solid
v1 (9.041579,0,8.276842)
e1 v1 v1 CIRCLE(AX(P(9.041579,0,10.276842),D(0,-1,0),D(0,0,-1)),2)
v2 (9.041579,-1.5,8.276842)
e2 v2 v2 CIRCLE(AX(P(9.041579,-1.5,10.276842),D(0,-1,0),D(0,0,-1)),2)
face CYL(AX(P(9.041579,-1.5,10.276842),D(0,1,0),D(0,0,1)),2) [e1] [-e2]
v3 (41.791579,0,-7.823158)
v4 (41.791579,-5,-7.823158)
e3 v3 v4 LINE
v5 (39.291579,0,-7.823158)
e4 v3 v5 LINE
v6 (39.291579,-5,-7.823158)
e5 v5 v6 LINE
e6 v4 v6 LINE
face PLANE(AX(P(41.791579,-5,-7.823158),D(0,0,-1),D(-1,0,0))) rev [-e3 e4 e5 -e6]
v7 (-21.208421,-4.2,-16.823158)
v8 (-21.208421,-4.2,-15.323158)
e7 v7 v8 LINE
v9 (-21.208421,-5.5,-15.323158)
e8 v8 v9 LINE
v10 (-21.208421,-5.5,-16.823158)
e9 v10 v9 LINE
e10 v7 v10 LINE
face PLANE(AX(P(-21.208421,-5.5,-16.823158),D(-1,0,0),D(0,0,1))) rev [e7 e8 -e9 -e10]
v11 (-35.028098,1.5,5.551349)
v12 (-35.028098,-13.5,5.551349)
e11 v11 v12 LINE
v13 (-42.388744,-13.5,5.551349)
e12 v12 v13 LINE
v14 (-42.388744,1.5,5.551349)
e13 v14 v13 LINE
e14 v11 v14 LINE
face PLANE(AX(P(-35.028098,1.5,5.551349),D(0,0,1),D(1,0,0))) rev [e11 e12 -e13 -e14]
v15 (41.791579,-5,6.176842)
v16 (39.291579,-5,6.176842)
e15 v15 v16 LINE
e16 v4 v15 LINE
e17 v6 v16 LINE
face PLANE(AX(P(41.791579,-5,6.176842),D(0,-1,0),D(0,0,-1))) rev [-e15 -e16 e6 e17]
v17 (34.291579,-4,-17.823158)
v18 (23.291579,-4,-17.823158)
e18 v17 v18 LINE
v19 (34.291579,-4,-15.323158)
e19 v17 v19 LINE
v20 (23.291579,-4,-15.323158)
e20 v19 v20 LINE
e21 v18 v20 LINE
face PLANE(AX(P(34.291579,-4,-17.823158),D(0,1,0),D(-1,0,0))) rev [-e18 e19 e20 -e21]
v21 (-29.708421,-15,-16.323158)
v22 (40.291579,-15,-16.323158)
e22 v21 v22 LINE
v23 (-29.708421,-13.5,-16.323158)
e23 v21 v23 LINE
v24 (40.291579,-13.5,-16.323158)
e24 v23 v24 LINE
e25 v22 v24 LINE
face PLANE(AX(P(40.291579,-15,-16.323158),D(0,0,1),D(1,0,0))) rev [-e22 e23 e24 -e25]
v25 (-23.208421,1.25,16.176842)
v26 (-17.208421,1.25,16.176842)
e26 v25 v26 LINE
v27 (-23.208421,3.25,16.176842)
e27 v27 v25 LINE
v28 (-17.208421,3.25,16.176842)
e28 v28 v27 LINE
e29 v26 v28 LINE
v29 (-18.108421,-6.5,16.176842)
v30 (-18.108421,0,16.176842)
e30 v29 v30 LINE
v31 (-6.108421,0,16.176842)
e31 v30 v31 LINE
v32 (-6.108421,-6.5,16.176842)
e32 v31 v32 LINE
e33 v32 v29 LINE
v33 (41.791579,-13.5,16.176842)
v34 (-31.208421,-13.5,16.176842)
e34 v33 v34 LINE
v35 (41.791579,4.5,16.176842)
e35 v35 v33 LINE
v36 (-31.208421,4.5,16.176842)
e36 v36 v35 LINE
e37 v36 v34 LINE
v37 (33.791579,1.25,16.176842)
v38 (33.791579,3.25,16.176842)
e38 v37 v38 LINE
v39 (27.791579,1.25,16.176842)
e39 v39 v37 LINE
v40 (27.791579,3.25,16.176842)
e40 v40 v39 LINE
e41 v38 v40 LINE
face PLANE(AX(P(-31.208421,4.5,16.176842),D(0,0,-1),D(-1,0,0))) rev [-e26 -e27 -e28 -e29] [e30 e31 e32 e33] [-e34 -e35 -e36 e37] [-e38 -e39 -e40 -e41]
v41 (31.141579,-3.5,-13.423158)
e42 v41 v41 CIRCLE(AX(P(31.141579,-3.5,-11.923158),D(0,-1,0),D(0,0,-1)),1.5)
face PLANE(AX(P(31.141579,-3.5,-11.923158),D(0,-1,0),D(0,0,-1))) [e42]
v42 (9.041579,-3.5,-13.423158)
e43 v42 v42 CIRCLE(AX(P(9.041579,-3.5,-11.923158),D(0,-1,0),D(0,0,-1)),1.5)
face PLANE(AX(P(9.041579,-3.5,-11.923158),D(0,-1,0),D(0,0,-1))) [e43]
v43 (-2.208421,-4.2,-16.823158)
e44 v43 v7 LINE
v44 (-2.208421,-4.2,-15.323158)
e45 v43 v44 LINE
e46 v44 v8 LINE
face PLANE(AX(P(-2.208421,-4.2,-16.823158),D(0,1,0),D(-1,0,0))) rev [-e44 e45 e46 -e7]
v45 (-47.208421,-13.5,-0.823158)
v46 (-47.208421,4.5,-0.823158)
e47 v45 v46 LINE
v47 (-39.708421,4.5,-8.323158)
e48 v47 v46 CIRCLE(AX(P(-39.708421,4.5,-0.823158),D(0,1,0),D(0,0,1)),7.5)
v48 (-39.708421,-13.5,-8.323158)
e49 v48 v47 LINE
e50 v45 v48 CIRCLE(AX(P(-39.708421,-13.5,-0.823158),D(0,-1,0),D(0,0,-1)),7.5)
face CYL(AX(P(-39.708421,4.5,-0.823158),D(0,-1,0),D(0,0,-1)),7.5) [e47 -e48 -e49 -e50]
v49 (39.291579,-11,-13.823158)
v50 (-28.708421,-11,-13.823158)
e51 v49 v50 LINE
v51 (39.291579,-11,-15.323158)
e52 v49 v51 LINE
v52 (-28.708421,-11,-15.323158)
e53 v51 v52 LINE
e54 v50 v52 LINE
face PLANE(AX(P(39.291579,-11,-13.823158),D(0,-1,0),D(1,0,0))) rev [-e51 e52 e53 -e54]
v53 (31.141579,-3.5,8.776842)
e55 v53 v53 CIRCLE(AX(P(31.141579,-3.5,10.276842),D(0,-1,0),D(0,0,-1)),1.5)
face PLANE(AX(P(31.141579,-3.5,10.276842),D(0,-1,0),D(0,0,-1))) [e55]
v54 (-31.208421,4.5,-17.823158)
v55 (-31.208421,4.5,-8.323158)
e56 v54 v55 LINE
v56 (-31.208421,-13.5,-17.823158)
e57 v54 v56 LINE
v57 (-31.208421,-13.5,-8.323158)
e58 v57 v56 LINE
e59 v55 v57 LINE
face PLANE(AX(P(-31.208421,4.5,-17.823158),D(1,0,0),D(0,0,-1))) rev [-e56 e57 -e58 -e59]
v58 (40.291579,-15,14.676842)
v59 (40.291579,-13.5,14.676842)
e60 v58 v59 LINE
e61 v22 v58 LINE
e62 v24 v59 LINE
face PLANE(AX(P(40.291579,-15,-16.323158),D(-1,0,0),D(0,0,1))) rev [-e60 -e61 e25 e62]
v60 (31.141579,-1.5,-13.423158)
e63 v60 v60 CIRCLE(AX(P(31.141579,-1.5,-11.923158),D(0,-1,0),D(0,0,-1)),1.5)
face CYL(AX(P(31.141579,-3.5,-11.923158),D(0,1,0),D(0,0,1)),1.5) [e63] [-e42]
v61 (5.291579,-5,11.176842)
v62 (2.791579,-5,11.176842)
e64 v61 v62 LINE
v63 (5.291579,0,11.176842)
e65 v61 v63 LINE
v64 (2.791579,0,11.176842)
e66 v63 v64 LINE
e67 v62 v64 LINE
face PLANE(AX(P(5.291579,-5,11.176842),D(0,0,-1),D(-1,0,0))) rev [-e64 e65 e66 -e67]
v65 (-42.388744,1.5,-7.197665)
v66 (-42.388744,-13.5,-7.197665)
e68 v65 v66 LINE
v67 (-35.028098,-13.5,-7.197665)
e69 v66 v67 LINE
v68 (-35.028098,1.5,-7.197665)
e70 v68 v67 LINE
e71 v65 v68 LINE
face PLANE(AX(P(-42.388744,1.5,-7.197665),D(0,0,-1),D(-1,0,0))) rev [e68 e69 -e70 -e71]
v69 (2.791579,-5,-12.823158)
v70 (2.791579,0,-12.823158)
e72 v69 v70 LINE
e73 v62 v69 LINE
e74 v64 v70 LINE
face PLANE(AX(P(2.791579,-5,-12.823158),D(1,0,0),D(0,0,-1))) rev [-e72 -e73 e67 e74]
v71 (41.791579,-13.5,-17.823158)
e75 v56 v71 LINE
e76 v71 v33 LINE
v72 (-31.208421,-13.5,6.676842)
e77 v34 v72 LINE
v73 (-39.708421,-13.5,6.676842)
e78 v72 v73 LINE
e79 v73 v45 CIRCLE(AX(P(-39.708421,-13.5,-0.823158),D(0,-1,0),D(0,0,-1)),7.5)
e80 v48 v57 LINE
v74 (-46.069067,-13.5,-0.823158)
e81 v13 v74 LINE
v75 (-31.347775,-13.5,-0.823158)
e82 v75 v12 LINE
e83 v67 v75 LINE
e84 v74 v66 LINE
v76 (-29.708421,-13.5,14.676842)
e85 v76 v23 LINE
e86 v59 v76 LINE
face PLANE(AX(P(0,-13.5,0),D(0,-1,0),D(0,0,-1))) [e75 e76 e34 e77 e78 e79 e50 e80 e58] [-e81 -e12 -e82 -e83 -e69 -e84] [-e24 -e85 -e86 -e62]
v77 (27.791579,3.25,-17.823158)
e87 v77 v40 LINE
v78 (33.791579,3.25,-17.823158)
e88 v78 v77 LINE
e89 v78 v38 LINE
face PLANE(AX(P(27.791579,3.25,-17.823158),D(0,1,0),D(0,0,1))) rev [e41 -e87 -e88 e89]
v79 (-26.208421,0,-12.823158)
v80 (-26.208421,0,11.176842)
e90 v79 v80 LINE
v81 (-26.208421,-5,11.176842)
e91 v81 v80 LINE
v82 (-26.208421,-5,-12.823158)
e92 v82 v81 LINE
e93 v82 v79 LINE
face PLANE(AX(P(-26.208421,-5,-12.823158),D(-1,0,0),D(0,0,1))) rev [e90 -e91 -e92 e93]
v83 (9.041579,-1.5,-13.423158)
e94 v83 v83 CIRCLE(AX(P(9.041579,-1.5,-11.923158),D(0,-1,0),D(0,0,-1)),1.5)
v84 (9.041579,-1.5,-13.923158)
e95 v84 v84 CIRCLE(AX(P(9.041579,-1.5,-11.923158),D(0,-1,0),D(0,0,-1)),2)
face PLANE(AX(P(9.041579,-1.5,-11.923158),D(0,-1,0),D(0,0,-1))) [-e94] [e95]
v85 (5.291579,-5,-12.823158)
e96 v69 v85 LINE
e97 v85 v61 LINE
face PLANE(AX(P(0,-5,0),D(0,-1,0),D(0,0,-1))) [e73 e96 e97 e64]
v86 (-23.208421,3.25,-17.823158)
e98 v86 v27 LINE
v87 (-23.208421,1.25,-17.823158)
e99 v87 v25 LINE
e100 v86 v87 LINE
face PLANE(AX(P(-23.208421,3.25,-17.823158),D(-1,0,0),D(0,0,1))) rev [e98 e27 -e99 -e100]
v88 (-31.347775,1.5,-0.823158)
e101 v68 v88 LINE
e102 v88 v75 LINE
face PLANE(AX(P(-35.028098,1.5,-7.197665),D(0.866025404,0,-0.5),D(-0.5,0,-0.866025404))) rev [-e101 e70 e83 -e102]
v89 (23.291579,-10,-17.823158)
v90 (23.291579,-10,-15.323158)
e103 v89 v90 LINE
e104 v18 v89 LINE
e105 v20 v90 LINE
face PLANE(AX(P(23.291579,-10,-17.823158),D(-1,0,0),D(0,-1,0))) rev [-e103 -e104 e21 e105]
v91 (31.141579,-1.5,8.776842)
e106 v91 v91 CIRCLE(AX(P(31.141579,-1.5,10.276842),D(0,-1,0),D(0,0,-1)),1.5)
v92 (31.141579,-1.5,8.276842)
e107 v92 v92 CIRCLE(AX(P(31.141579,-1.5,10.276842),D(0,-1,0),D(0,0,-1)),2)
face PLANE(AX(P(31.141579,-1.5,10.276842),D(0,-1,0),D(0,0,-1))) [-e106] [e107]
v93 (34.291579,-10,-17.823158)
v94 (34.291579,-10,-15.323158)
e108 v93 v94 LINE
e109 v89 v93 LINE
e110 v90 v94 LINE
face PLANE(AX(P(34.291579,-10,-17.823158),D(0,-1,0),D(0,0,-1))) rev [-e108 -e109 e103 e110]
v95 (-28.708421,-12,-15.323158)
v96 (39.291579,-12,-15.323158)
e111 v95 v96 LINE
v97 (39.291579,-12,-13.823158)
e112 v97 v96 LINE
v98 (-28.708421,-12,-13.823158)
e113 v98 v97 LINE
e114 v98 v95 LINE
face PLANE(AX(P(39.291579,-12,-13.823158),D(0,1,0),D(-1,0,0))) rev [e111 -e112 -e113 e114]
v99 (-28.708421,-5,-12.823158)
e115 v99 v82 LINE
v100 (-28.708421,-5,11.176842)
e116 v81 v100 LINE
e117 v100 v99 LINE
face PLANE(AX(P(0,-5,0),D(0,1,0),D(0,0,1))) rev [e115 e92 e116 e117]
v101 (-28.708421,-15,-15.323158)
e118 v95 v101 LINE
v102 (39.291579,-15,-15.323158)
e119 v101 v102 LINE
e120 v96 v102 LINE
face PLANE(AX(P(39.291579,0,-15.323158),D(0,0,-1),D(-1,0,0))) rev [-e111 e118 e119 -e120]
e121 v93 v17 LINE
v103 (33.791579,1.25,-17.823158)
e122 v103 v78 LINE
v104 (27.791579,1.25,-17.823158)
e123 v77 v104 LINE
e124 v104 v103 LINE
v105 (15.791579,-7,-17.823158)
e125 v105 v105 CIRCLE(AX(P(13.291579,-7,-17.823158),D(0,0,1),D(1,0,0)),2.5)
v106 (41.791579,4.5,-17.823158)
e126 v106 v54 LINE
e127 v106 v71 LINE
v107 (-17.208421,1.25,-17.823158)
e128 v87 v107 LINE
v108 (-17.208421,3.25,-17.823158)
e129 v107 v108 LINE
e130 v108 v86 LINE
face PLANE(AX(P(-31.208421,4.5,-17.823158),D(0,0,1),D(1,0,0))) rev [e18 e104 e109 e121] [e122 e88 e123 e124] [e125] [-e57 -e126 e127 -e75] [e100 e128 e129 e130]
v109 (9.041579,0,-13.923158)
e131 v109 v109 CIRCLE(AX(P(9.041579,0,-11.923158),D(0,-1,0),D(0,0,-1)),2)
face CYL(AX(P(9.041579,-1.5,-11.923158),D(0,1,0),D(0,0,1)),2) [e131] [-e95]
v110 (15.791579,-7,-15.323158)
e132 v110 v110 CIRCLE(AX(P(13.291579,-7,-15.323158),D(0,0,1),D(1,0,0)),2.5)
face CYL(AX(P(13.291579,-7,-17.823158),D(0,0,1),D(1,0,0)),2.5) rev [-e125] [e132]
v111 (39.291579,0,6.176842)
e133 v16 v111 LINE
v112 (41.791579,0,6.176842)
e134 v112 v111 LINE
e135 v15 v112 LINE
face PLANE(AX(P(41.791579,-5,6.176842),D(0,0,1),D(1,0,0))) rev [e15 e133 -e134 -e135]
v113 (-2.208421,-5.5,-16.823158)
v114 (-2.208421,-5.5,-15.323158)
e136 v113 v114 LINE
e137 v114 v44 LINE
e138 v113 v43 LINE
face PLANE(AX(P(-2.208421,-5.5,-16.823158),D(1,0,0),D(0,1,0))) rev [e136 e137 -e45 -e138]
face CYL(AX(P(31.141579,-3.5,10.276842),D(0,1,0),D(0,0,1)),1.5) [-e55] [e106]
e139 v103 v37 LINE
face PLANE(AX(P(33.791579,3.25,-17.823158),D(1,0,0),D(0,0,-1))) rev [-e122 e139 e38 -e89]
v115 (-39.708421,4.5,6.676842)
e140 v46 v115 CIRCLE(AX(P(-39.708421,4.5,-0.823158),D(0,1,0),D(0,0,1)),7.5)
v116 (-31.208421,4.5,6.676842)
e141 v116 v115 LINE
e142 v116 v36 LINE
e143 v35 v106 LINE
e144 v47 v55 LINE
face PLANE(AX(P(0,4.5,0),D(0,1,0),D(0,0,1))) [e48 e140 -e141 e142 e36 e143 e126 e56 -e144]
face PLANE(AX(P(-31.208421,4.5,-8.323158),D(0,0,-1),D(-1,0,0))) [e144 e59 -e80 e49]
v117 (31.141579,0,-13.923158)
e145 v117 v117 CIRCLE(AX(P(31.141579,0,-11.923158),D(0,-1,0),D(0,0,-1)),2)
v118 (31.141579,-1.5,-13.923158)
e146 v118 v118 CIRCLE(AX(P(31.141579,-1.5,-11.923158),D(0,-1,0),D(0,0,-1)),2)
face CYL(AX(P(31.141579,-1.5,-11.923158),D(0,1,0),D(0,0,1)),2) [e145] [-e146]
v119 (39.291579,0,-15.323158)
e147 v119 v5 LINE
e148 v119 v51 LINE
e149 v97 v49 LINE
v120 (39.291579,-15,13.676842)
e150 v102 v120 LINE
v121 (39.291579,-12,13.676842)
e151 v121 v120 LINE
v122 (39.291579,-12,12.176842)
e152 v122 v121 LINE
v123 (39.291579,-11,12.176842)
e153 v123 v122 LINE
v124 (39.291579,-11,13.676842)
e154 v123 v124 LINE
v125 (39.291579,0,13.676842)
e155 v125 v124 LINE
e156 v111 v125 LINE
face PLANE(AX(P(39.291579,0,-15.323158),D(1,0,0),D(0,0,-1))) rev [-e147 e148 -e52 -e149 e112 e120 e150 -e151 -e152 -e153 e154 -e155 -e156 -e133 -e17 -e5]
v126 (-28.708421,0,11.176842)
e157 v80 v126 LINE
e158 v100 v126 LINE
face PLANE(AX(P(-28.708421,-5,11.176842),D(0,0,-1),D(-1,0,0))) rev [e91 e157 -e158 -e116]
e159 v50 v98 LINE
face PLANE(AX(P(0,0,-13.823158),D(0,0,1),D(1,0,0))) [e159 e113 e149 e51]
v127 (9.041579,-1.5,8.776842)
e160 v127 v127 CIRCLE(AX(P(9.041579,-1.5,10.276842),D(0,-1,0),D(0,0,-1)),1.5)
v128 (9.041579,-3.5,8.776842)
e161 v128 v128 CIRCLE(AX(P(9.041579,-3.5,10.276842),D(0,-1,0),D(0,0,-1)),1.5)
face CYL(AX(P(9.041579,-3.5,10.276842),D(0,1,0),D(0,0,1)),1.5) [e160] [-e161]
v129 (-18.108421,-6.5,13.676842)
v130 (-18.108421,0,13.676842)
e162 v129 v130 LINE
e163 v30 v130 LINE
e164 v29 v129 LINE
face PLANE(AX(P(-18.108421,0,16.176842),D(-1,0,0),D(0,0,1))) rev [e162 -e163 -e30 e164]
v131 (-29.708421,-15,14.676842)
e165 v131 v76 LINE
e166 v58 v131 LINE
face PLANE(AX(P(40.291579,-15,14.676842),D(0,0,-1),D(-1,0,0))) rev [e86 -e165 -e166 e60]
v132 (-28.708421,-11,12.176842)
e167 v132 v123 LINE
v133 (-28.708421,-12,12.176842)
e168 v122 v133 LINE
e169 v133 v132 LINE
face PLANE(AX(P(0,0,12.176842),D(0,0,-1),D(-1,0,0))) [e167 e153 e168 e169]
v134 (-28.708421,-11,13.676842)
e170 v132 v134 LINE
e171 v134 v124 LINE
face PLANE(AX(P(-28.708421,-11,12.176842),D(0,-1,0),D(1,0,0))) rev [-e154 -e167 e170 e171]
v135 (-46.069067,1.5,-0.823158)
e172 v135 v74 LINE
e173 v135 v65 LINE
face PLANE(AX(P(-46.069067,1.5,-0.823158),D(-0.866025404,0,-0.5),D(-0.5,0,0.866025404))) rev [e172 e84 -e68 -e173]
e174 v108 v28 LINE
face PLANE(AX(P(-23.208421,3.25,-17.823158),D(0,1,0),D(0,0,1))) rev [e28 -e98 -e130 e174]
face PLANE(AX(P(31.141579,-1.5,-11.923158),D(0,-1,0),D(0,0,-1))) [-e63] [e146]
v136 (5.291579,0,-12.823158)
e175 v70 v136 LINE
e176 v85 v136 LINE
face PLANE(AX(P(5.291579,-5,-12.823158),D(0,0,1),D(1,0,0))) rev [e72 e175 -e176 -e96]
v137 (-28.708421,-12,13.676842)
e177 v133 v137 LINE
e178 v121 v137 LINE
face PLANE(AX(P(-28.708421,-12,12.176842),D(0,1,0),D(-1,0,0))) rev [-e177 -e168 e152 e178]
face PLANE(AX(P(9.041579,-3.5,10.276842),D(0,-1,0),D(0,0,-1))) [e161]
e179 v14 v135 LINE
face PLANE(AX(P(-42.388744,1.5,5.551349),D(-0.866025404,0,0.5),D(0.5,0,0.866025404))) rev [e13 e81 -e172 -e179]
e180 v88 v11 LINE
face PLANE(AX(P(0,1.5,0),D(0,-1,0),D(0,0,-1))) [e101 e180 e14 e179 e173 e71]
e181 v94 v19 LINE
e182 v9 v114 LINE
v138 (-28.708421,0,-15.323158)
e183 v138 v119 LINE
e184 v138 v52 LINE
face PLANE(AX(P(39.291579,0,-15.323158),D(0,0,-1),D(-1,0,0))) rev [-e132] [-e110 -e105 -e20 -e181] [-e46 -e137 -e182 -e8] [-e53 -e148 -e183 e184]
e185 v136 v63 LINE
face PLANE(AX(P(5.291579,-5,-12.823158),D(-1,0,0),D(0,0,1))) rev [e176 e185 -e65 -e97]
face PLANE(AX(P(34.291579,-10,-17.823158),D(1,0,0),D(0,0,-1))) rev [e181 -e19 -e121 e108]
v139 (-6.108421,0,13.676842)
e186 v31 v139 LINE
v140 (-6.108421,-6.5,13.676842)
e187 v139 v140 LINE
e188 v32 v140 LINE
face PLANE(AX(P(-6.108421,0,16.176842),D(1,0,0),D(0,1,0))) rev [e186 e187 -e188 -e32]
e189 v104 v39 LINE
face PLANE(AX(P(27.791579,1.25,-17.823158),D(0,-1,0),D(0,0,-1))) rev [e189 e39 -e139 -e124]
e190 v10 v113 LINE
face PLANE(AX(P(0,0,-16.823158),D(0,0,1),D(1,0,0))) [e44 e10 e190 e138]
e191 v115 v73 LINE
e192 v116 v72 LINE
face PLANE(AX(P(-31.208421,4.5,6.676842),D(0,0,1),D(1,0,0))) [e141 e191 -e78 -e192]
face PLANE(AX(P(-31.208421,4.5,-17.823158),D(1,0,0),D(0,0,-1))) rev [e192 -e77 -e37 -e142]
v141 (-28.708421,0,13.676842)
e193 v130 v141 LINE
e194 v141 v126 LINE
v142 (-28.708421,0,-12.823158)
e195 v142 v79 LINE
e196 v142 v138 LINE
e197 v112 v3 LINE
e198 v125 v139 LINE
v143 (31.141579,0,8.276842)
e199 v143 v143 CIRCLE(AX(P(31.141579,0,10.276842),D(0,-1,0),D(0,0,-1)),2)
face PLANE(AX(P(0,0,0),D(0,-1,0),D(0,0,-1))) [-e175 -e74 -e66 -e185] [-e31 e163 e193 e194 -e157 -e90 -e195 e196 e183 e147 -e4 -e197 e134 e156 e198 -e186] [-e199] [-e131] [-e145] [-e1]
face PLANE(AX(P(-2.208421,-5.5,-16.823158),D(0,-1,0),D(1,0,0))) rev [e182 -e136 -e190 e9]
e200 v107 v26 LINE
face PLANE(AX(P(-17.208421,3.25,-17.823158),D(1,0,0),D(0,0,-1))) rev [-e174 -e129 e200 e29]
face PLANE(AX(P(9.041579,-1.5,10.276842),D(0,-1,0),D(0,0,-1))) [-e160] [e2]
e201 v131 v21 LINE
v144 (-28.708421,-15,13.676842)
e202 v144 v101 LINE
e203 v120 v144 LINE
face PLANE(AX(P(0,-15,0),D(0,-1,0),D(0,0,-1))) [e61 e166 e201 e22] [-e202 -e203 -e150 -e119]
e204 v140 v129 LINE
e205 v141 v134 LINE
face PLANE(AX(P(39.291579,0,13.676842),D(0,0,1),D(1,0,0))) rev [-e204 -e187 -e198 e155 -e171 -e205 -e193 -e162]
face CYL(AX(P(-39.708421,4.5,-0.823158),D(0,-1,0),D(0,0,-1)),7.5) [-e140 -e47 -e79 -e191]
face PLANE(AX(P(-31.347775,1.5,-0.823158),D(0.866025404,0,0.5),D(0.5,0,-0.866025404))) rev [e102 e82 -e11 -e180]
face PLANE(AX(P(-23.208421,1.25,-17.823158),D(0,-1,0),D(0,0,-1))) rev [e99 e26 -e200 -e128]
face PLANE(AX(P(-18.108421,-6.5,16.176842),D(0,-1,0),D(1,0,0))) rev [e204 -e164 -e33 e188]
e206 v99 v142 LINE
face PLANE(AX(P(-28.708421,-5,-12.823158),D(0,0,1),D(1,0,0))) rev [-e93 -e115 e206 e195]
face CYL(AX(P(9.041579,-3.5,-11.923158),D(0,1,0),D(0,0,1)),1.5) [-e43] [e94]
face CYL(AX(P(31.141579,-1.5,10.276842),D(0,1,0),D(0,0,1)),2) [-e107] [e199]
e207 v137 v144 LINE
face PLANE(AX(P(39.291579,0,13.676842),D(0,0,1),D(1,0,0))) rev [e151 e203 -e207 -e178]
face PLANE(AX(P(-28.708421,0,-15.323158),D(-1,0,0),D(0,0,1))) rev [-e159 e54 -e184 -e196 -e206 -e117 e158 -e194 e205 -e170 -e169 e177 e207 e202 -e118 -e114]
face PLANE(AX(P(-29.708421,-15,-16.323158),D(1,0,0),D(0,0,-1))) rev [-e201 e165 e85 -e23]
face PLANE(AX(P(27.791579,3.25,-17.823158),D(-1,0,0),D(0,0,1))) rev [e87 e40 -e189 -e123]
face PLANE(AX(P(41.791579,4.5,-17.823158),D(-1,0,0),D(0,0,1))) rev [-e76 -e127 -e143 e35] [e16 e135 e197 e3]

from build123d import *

# Parameters (mm, degrees)
SKETCH1_W             = 73
SKETCH1_H             = 34
BASE_DEPTH            = 4.5
SKETCH21_W            = 73
SKETCH21_H            = 34
EXTRUDE_UP_DEPTH      = 13.5
SKETCH22_W            = 68
SKETCH22_H            = 29
CUT_DOWN_DEPTH        = 13.5
SKETCH27_R            = 2
BOSS_EXTRUDE15_DEPTH  = 1.5
SKETCH29_R            = 2
BOSS_EXTRUDE16_DEPTH  = 1.5
SKETCH30_R            = 2
BOSS_EXTRUDE17_DEPTH  = 1.5
SKETCH28_R            = 2
BOSS_EXTRUDE18_DEPTH  = 1.5
SKETCH31_R            = 1.5
BOSS_EXTRUDE19_DEPTH  = 2
SKETCH32_R            = 1.5
BOSS_EXTRUDE20_DEPTH  = 2
SKETCH33_R            = 1.5
BOSS_EXTRUDE21_DEPTH  = 2
SKETCH34_R            = 1.5
BOSS_EXTRUDE22_DEPTH  = 2
SKETCH39_W            = 19
SKETCH39_H            = 1.3
WALL_SLIT_DEPTH       = 1.5
SKETCH41_W            = 2.5
SKETCH41_H            = 24
OUTSIDE_BLOCK_DEPTH   = 5
SKETCH44_W            = 2.5
SKETCH44_H            = 24
INSIDE_BLOCK_DEPTH    = 5
SKETCH45_W            = 12
SKETCH45_H            = 6.5
USB_HOLE_DEPTH        = 2.5
SKETCH62_W            = 70
SKETCH62_H            = 31
RAISE_LIP_DEPTH       = 1.5
SKETCH63_W            = 68
SKETCH63_H            = 29
CUT_LIP_DEPTH         = 1.5
SKETCH47_W            = 6
SKETCH47_H            = 2
TOP_TIE_HOLE_DEPTH    = 34
SKETCH48_W            = 6
SKETCH48_H            = 2
BOTTOM_TIE_HOLE_DEPTH = 34
SKETCH56_W            = 14
SKETCH56_H            = 5
WIRE_HOLE_DEPTH       = 2.5
SKETCH68_W            = 68
SKETCH68_H            = 1
RIGHT_LEDGE_DEPTH     = 1.5
SKETCH67_W            = 68
SKETCH67_H            = 1
LEFT_LEDGE_DEPTH      = 1.5
SKETCH65_W            = 16
SKETCH65_H            = 15
NUT_HOLE_SQUARE_DEPTH = 18
NUT_HOLE_FILLET_R     = 7.5
NUT_HOLE_HEX_DEPTH    = 15
SKETCH69_W            = 11
SKETCH69_H            = 6
CUT_EXTRUDE1_DEPTH    = 2.5
SKETCH70_R            = 2.5
CUT_EXTRUDE2_DEPTH    = 2.5


with BuildPart() as part:
    # Sketch1 → base (new body)
    with BuildSketch(Plane(origin=(0, 0, 0), x_dir=(1, 0, 0), z_dir=(0, 1, 0))):
        with Locations((5.291578947, 0.823157895)):
            Rectangle(SKETCH1_W, SKETCH1_H)
    extrude(amount=BASE_DEPTH)

    # Sketch21 → extrude up (add)
    with BuildSketch(Plane(origin=(0, 0, 0), x_dir=(-1, 0, 0), z_dir=(0, -1, 0))):
        with Locations((-5.291578947, 0.823157895)):
            Rectangle(SKETCH21_W, SKETCH21_H)
    extrude(amount=EXTRUDE_UP_DEPTH)

    # Sketch22 → cut down (cut)
    with BuildSketch(Plane(origin=(0, -13.5, 0), x_dir=(-1, 0, 0), z_dir=(0, -1, 0))):
        with Locations((-5.291578947, 0.823157895)):
            Rectangle(SKETCH22_W, SKETCH22_H)
    extrude(amount=-CUT_DOWN_DEPTH, mode=Mode.SUBTRACT)

    # Sketch27 → Boss-Extrude15 (add)
    with BuildSketch(Plane.XZ):
        with Locations(Location((31.141578947, -11.923157895, 0), (0, 0, 270))):
            Circle(SKETCH27_R)
    extrude(amount=BOSS_EXTRUDE15_DEPTH)

    # Sketch29 → Boss-Extrude16 (add)
    with BuildSketch(Plane.XZ):
        with Locations(Location((9.041578947, -11.923157895, 0), (0, 0, 270))):
            Circle(SKETCH29_R)
    extrude(amount=BOSS_EXTRUDE16_DEPTH)

    # Sketch30 → Boss-Extrude17 (add)
    with BuildSketch(Plane.XZ):
        with Locations(Location((9.041578947, 10.276842105, 0), (0, 0, 270))):
            Circle(SKETCH30_R)
    extrude(amount=BOSS_EXTRUDE17_DEPTH)

    # Sketch28 → Boss-Extrude18 (add)
    with BuildSketch(Plane.XZ):
        with Locations(Location((31.141578947, 10.276842105, 0), (0, 0, 270))):
            Circle(SKETCH28_R)
    extrude(amount=BOSS_EXTRUDE18_DEPTH)

    # Sketch31 → Boss-Extrude19 (add)
    with BuildSketch(Plane.XZ.offset(1.5)):
        with Locations(Location((31.141578947, -11.923157895, 0), (0, 0, 270))):
            Circle(SKETCH31_R)
    extrude(amount=BOSS_EXTRUDE19_DEPTH)

    # Sketch32 → Boss-Extrude20 (add)
    with BuildSketch(Plane.XZ.offset(1.5)):
        with Locations(Location((9.041578947, -11.923157895, 0), (0, 0, 270))):
            Circle(SKETCH32_R)
    extrude(amount=BOSS_EXTRUDE20_DEPTH)

    # Sketch33 → Boss-Extrude21 (add)
    with BuildSketch(Plane.XZ.offset(1.5)):
        with Locations(Location((9.041578947, 10.276842105, 0), (0, 0, 270))):
            Circle(SKETCH33_R)
    extrude(amount=BOSS_EXTRUDE21_DEPTH)

    # Sketch34 → Boss-Extrude22 (add)
    with BuildSketch(Plane.XZ.offset(1.5)):
        with Locations(Location((31.141578947, 10.276842105, 0), (0, 0, 270))):
            Circle(SKETCH34_R)
    extrude(amount=BOSS_EXTRUDE22_DEPTH)

    # Sketch39 → wall slit (cut)
    with BuildSketch(Plane.XY.offset(-15.323157895)):
        with Locations((-11.708421053, -4.85)):
            Rectangle(SKETCH39_W, SKETCH39_H)
    extrude(amount=-WALL_SLIT_DEPTH, mode=Mode.SUBTRACT)

    # Sketch41 → outside block (add)
    with BuildSketch(Plane.XZ):
        with Locations((-27.458421053, -0.823157895)):
            Rectangle(SKETCH41_W, SKETCH41_H)
    extrude(amount=OUTSIDE_BLOCK_DEPTH)

    # Sketch44 → inside block (add)
    with BuildSketch(Plane.XZ):
        with Locations((4.041578947, -0.823157895)):
            Rectangle(SKETCH44_W, SKETCH44_H)
    extrude(amount=INSIDE_BLOCK_DEPTH)

    # Sketch45 → usb hole (cut)
    with BuildSketch(Plane(origin=(0, 0, 13.676842105), x_dir=(-1, 0, 0), z_dir=(0, 0, -1))):
        with Locations((12.108421053, -3.25)):
            Rectangle(SKETCH45_W, SKETCH45_H)
    extrude(amount=-USB_HOLE_DEPTH, mode=Mode.SUBTRACT)

    # Sketch62 → raise lip (add)
    with BuildSketch(Plane.XZ.offset(13.5)):
        with Locations((5.291578947, -0.823157895)):
            Rectangle(SKETCH62_W, SKETCH62_H)
    extrude(amount=RAISE_LIP_DEPTH)

    # Sketch63 → cut lip (cut)
    with BuildSketch(Plane.XZ.offset(15)):
        with Locations((5.291578947, -0.823157895)):
            Rectangle(SKETCH63_W, SKETCH63_H)
    extrude(amount=-CUT_LIP_DEPTH, mode=Mode.SUBTRACT)

    # Sketch47 → top tie hole (cut)
    with BuildSketch(Plane.XY.offset(16.176842105)):
        with Locations((30.791578947, 2.25)):
            Rectangle(SKETCH47_W, SKETCH47_H)
    extrude(amount=-TOP_TIE_HOLE_DEPTH, mode=Mode.SUBTRACT)

    # Sketch48 → bottom tie hole (cut)
    with BuildSketch(Plane.XY.offset(16.176842105)):
        with Locations((-20.208421053, 2.25)):
            Rectangle(SKETCH48_W, SKETCH48_H)
    extrude(amount=-BOTTOM_TIE_HOLE_DEPTH, mode=Mode.SUBTRACT)

    # Sketch56 → wire hole (cut)
    with BuildSketch(Plane.ZY.offset(-39.291578947)):
        with Locations((-0.823157895, -2.5)):
            Rectangle(SKETCH56_W, SKETCH56_H)
    extrude(amount=-WIRE_HOLE_DEPTH, mode=Mode.SUBTRACT)

    # Sketch68 → right ledge (add)
    with BuildSketch(Plane.XY.offset(-15.323157895)):
        with Locations((5.291578947, -11.5)):
            Rectangle(SKETCH68_W, SKETCH68_H)
    extrude(amount=RIGHT_LEDGE_DEPTH)

    # Sketch67 → left ledge (add)
    with BuildSketch(Plane(origin=(0, 0, 13.676842105), x_dir=(-1, 0, 0), z_dir=(0, 0, -1))):
        with Locations((-5.291578947, -11.5)):
            Rectangle(SKETCH67_W, SKETCH67_H)
    extrude(amount=LEFT_LEDGE_DEPTH)

    # Sketch65 → nut hole square (add)
    with BuildSketch(Plane.XZ.offset(13.5)):
        with Locations((-39.208421053, -0.823157895)):
            Rectangle(SKETCH65_W, SKETCH65_H)
    extrude(amount=-NUT_HOLE_SQUARE_DEPTH)

    # nut hole fillet
    nut_hole_fillet_edges = [part.edges().sort_by_distance(p)[0] for p in [
        (-47.208421053, -4.5, -8.323157895),
        (-47.208421053, -4.5, 6.676842105),
    ]]
    fillet(nut_hole_fillet_edges, radius=NUT_HOLE_FILLET_R - 0.0001)  # a hair under: the kernel refuses the full size

    # Sketch66 → nut hole hex (cut)
    with BuildSketch(Plane.XZ.offset(13.5)):
        Polygon((-35.028097876, 5.551348835), (-42.388744229, 5.551348835), (-46.069067406, -0.823157895), (-42.388744229, -7.197664625), (-35.028097876, -7.197664625), (-31.347774699, -0.823157895), align=None)
    extrude(amount=-NUT_HOLE_HEX_DEPTH, mode=Mode.SUBTRACT)

    # Sketch69 → Cut-Extrude1 (cut)
    with BuildSketch(Plane.XY.offset(-15.323157895)):
        with Locations((28.791578947, -7)):
            Rectangle(SKETCH69_W, SKETCH69_H)
    extrude(amount=-CUT_EXTRUDE1_DEPTH, mode=Mode.SUBTRACT)

    # Sketch70 → Cut-Extrude2 (cut)
    with BuildSketch(Plane.XY.offset(-15.323157895)):
        with Locations((13.291578947, -7)):
            Circle(SKETCH70_R)
    extrude(amount=-CUT_EXTRUDE2_DEPTH, mode=Mode.SUBTRACT)


solid = part.part
